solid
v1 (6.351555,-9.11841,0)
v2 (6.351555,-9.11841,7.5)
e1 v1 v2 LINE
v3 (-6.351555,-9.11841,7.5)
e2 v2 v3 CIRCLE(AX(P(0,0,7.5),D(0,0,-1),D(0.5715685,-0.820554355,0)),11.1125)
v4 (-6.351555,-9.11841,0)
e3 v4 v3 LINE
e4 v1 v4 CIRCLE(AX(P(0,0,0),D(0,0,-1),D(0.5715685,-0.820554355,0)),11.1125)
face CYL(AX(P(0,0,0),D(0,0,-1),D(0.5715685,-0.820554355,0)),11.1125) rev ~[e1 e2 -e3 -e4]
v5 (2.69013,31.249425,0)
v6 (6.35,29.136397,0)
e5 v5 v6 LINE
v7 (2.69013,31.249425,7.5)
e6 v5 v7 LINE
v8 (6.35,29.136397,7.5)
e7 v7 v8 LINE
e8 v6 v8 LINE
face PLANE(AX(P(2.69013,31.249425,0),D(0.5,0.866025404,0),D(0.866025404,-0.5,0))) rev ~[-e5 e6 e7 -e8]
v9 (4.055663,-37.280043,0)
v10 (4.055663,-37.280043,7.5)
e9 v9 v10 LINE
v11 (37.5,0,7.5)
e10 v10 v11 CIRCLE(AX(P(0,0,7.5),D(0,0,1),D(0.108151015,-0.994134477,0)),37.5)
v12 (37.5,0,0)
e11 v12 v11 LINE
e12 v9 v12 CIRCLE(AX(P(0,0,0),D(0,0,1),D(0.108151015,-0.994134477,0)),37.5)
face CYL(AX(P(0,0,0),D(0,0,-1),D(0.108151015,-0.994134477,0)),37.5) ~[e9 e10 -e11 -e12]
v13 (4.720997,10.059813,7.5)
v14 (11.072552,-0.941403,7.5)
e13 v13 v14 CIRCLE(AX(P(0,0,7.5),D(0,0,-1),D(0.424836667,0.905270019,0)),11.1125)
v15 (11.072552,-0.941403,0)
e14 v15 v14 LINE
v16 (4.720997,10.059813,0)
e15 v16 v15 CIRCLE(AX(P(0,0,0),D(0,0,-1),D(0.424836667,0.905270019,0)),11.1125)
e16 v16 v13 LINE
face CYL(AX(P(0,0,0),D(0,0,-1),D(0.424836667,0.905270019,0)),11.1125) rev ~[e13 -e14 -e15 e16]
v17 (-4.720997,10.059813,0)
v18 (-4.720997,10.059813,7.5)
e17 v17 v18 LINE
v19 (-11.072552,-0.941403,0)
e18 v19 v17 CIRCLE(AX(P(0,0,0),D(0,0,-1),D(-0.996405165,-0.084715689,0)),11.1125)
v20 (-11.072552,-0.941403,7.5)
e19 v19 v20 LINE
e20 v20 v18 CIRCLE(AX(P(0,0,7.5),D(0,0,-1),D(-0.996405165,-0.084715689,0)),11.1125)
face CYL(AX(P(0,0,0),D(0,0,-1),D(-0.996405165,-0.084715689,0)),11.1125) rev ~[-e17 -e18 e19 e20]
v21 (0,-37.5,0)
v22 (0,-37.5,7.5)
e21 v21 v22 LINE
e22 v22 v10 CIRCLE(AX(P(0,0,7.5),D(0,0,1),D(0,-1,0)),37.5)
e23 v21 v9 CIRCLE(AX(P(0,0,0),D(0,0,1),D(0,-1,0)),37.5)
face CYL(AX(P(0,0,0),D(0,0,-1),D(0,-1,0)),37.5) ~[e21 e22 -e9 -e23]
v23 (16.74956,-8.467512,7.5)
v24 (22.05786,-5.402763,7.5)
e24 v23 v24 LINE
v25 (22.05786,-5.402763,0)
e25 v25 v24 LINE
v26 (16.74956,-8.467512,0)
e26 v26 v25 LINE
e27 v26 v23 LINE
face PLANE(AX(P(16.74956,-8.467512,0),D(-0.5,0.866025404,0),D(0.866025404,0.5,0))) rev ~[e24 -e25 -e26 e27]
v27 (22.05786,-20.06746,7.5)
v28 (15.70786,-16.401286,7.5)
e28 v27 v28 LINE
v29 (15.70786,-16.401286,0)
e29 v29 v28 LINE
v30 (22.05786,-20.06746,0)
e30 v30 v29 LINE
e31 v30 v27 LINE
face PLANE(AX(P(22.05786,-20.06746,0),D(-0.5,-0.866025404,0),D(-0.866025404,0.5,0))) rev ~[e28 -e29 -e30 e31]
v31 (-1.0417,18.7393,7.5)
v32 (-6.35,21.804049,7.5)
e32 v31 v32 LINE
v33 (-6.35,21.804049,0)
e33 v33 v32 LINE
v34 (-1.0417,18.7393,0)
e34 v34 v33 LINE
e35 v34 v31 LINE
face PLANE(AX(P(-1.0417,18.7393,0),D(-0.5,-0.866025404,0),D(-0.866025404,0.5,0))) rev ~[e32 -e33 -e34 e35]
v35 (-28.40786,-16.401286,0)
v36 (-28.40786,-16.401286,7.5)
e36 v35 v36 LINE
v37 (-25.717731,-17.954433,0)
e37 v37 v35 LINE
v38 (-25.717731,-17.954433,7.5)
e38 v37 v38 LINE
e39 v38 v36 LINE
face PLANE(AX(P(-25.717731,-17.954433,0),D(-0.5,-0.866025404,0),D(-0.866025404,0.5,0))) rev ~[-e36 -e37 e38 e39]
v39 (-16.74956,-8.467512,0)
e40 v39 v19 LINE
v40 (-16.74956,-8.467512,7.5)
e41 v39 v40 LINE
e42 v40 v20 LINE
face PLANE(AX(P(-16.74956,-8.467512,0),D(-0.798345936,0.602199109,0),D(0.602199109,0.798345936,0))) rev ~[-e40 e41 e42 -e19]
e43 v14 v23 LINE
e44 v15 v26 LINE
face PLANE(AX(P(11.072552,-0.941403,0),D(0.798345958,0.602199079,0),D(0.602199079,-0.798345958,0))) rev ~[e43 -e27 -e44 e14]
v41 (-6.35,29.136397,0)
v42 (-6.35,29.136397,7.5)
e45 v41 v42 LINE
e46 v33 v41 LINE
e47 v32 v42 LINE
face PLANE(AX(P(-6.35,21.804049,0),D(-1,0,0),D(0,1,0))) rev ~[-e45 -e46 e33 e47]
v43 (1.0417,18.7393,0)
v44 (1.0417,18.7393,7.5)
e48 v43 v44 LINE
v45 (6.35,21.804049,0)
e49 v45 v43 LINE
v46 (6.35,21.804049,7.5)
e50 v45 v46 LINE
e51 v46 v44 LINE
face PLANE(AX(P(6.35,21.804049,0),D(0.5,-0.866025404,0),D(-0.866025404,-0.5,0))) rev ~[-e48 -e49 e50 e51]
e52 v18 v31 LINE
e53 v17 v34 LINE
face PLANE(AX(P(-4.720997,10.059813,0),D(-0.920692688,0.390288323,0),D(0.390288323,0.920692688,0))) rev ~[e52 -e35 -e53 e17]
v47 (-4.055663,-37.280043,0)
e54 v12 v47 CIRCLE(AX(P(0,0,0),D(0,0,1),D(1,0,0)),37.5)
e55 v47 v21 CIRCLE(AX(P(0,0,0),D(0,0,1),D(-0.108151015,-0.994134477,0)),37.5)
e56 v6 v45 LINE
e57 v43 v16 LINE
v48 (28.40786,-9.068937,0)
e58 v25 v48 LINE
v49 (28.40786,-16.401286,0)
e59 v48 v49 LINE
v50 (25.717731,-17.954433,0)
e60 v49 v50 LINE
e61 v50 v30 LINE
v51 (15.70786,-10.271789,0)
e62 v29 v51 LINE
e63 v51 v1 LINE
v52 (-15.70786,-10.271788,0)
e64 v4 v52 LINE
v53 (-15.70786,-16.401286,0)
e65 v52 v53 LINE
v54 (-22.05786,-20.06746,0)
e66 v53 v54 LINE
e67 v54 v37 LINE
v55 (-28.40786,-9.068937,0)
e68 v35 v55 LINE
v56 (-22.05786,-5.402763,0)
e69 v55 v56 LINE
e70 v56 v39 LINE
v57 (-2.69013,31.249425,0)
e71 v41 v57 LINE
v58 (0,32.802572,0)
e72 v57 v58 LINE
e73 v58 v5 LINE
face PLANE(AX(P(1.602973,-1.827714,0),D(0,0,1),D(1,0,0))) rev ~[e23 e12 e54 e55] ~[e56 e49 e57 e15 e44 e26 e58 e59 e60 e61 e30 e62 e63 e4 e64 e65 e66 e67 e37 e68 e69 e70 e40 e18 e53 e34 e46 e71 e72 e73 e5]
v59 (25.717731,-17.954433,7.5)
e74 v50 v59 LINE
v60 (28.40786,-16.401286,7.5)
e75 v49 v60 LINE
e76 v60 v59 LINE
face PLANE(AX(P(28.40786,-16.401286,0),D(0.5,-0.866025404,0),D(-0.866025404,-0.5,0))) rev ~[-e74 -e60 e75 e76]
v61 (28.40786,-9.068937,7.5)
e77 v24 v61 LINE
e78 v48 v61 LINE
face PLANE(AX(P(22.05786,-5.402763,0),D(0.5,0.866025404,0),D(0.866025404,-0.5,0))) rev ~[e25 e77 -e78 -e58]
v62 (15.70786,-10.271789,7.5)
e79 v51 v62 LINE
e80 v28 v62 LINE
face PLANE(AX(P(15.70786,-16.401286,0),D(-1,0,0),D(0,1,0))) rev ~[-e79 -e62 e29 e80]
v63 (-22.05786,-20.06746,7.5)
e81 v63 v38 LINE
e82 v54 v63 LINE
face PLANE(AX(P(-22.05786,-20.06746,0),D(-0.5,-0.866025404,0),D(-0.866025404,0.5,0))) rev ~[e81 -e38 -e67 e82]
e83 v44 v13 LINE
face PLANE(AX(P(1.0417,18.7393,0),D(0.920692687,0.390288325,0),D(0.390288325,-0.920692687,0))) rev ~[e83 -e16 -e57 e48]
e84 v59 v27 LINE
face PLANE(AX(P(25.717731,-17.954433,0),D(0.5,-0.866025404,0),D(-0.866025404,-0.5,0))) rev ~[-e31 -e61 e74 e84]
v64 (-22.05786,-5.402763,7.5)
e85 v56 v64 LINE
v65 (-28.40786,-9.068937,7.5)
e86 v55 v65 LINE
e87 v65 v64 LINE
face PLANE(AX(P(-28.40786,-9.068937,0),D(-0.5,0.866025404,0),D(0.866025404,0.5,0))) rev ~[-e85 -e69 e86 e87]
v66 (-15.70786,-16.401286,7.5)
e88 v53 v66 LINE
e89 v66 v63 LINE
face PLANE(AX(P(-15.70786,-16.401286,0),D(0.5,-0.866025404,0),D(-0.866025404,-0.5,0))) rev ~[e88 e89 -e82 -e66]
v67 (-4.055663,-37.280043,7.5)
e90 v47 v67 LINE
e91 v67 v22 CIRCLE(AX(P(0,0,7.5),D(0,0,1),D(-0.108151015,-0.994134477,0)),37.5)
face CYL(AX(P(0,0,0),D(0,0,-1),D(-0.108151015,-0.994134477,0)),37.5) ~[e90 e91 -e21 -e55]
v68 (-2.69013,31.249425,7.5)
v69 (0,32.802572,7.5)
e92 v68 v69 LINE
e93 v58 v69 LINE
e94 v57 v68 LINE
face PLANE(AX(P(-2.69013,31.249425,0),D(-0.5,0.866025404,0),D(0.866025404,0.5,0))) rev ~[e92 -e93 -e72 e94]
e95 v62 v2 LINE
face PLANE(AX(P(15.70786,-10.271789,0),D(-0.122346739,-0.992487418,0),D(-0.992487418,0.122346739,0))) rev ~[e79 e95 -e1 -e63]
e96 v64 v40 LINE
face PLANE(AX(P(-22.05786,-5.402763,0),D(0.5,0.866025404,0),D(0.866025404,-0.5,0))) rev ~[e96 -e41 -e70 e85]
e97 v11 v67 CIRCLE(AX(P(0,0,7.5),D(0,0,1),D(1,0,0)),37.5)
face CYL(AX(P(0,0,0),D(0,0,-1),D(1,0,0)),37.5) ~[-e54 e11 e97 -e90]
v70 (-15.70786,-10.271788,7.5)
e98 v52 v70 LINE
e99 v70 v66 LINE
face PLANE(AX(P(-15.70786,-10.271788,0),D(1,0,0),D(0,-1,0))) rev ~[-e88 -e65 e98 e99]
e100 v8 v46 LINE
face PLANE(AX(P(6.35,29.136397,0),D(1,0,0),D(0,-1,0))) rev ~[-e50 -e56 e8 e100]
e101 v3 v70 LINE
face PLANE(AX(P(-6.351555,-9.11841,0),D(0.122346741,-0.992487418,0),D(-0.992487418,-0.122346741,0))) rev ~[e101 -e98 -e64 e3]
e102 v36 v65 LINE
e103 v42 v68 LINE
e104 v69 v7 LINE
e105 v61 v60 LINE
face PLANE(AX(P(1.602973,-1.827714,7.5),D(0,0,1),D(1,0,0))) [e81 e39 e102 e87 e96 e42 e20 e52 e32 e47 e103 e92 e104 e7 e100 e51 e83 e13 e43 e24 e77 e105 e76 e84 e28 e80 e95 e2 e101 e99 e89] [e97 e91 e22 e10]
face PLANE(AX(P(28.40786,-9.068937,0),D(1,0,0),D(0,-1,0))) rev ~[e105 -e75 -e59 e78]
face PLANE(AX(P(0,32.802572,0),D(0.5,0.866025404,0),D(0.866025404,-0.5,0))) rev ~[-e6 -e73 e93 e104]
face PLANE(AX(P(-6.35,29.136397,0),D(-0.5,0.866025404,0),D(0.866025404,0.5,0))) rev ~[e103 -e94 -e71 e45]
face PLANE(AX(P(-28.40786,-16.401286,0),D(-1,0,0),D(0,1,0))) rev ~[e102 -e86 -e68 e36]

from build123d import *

# Parameters (mm, degrees)
F1_DEPTH = 7.5


# Not quite as in the source:
# - ends of sketch curves that miss each other by under 0.0002 mm in the source are joined


with BuildPart() as f1:
    # F0 (on Top) → F1 (new body)
    with BuildSketch(Plane.XY):
        with BuildLine():
            ThreePointArc((4.0556630512, -37.2800428811), (27.913593144, -25.0415917583), (37.5, 0))
            ThreePointArc((37.5, 0), (-25.0415917583, 27.913593144), (-4.0556630512, -37.2800428811))
            ThreePointArc((-4.0556630512, -37.2800428811), (-2.0308116554, -37.4449703434), (0, -37.5))
            ThreePointArc((0, -37.5), (2.0308116554, -37.4449703434), (4.0556630512, -37.2800428811))
        make_face()
        with BuildLine():
            ThreePointArc((-28.4078604382, -13.2949914876), (-27.1628882386, 15.6825009444), (-2.6901296616, 31.2494245665))
            Line((-2.6901296616, 31.2494245665), (7.92e-08, 32.8025716965))
            Line((7.92e-08, 32.8025716965), (2.6901298478, 31.2494245505))
            ThreePointArc((2.6901298478, 31.2494245505), (23.109946567, 21.2059827173), (31.365001727, 0))
            ThreePointArc((31.365001727, 0), (30.6167921454, -6.8099465531), (28.407860359, -13.2949916568))
            Line((28.407860359, -13.2949916568), (28.407860359, -16.4012859168))
            Line((28.407860359, -16.4012859168), (25.7177305905, -17.9544330629))
            ThreePointArc((25.7177305905, -17.9544330629), (-9.34e-08, -31.365001727), (-25.7177306974, -17.9544329097))
            Line((-25.7177306974, -17.9544329097), (-28.4078604382, -16.4012857797))
            Line((-28.4078604382, -16.4012857797), (-28.4078604382, -13.2949914876))
        make_face(mode=Mode.SUBTRACT)
        with BuildLine():
            ThreePointArc((-11.0725523918, -0.9414030915), (-9.6237073053, 5.5562499901), (-4.7209972243, 10.059813192))
            Line((-4.7209972243, 10.059813192), (-1.0416995056, 18.7393003948))
            Line((-1.0416995056, 18.7393003948), (-6.3499999208, 21.8040490685))
            Line((-6.3499999208, 21.8040490685), (-6.3499999208, 29.1363974872))
            Line((-6.3499999208, 29.1363974872), (-2.6901296616, 31.2494245665))
            ThreePointArc((-2.6901296616, 31.2494245665), (-27.1628882386, 15.6825009444), (-28.4078604382, -13.2949914876))
            Line((-28.4078604382, -13.2949914876), (-28.4078604382, -9.068937361))
            Line((-28.4078604382, -9.068937361), (-22.0578604382, -5.4027631516))
            Line((-22.0578604382, -5.4027631516), (-16.7495600286, -8.467511822))
            Line((-16.7495600286, -8.467511822), (-11.0725523918, -0.9414030915))
        make_face()
        with BuildLine():
            Line((6.3500000792, 21.8040490685), (1.0416996696, 18.739300398))
            Line((1.0416996696, 18.739300398), (4.7209974611, 10.0598130809))
            ThreePointArc((4.7209974611, 10.0598130809), (9.6237072938, 5.5562500099), (11.0725524179, -0.941402785))
            Line((11.0725524179, -0.941402785), (16.7495599439, -8.4675119624))
            Line((16.7495599439, -8.4675119624), (22.057860359, -5.4027632888))
            Line((22.057860359, -5.4027632888), (28.407860359, -9.0689374981))
            Line((28.407860359, -9.0689374981), (28.407860359, -13.2949916568))
            ThreePointArc((28.407860359, -13.2949916568), (30.6167921454, -6.8099465531), (31.365001727, 0))
            ThreePointArc((31.365001727, 0), (23.109946567, 21.2059827173), (2.6901298478, 31.2494245505))
            Line((2.6901298478, 31.2494245505), (6.3500000792, 29.1363974872))
            Line((6.3500000792, 29.1363974872), (6.3500000792, 21.8040490685))
        make_face()
        with BuildLine():
            Line((-6.3515551695, -9.1184101234), (-15.7078604382, -10.2717884324))
            Line((-15.7078604382, -10.2717884324), (-15.7078604382, -16.4012857797))
            Line((-15.7078604382, -16.4012857797), (-22.0578604382, -20.067459989))
            Line((-22.0578604382, -20.067459989), (-25.7177306974, -17.9544329097))
            ThreePointArc((-25.7177306974, -17.9544329097), (-9.34e-08, -31.365001727), (25.7177305905, -17.9544330629))
            Line((25.7177305905, -17.9544330629), (22.057860359, -20.0674601262))
            Line((22.057860359, -20.0674601262), (15.707860359, -16.4012859168))
            Line((15.707860359, -16.4012859168), (15.707860359, -10.271788576))
            Line((15.707860359, -10.271788576), (6.3515549548, -9.118410273))
            ThreePointArc((6.3515549548, -9.118410273), (-1.15e-08, -11.1125), (-6.3515551695, -9.1184101234))
        make_face()
    extrude(amount=F1_DEPTH)


solid = f1.part
